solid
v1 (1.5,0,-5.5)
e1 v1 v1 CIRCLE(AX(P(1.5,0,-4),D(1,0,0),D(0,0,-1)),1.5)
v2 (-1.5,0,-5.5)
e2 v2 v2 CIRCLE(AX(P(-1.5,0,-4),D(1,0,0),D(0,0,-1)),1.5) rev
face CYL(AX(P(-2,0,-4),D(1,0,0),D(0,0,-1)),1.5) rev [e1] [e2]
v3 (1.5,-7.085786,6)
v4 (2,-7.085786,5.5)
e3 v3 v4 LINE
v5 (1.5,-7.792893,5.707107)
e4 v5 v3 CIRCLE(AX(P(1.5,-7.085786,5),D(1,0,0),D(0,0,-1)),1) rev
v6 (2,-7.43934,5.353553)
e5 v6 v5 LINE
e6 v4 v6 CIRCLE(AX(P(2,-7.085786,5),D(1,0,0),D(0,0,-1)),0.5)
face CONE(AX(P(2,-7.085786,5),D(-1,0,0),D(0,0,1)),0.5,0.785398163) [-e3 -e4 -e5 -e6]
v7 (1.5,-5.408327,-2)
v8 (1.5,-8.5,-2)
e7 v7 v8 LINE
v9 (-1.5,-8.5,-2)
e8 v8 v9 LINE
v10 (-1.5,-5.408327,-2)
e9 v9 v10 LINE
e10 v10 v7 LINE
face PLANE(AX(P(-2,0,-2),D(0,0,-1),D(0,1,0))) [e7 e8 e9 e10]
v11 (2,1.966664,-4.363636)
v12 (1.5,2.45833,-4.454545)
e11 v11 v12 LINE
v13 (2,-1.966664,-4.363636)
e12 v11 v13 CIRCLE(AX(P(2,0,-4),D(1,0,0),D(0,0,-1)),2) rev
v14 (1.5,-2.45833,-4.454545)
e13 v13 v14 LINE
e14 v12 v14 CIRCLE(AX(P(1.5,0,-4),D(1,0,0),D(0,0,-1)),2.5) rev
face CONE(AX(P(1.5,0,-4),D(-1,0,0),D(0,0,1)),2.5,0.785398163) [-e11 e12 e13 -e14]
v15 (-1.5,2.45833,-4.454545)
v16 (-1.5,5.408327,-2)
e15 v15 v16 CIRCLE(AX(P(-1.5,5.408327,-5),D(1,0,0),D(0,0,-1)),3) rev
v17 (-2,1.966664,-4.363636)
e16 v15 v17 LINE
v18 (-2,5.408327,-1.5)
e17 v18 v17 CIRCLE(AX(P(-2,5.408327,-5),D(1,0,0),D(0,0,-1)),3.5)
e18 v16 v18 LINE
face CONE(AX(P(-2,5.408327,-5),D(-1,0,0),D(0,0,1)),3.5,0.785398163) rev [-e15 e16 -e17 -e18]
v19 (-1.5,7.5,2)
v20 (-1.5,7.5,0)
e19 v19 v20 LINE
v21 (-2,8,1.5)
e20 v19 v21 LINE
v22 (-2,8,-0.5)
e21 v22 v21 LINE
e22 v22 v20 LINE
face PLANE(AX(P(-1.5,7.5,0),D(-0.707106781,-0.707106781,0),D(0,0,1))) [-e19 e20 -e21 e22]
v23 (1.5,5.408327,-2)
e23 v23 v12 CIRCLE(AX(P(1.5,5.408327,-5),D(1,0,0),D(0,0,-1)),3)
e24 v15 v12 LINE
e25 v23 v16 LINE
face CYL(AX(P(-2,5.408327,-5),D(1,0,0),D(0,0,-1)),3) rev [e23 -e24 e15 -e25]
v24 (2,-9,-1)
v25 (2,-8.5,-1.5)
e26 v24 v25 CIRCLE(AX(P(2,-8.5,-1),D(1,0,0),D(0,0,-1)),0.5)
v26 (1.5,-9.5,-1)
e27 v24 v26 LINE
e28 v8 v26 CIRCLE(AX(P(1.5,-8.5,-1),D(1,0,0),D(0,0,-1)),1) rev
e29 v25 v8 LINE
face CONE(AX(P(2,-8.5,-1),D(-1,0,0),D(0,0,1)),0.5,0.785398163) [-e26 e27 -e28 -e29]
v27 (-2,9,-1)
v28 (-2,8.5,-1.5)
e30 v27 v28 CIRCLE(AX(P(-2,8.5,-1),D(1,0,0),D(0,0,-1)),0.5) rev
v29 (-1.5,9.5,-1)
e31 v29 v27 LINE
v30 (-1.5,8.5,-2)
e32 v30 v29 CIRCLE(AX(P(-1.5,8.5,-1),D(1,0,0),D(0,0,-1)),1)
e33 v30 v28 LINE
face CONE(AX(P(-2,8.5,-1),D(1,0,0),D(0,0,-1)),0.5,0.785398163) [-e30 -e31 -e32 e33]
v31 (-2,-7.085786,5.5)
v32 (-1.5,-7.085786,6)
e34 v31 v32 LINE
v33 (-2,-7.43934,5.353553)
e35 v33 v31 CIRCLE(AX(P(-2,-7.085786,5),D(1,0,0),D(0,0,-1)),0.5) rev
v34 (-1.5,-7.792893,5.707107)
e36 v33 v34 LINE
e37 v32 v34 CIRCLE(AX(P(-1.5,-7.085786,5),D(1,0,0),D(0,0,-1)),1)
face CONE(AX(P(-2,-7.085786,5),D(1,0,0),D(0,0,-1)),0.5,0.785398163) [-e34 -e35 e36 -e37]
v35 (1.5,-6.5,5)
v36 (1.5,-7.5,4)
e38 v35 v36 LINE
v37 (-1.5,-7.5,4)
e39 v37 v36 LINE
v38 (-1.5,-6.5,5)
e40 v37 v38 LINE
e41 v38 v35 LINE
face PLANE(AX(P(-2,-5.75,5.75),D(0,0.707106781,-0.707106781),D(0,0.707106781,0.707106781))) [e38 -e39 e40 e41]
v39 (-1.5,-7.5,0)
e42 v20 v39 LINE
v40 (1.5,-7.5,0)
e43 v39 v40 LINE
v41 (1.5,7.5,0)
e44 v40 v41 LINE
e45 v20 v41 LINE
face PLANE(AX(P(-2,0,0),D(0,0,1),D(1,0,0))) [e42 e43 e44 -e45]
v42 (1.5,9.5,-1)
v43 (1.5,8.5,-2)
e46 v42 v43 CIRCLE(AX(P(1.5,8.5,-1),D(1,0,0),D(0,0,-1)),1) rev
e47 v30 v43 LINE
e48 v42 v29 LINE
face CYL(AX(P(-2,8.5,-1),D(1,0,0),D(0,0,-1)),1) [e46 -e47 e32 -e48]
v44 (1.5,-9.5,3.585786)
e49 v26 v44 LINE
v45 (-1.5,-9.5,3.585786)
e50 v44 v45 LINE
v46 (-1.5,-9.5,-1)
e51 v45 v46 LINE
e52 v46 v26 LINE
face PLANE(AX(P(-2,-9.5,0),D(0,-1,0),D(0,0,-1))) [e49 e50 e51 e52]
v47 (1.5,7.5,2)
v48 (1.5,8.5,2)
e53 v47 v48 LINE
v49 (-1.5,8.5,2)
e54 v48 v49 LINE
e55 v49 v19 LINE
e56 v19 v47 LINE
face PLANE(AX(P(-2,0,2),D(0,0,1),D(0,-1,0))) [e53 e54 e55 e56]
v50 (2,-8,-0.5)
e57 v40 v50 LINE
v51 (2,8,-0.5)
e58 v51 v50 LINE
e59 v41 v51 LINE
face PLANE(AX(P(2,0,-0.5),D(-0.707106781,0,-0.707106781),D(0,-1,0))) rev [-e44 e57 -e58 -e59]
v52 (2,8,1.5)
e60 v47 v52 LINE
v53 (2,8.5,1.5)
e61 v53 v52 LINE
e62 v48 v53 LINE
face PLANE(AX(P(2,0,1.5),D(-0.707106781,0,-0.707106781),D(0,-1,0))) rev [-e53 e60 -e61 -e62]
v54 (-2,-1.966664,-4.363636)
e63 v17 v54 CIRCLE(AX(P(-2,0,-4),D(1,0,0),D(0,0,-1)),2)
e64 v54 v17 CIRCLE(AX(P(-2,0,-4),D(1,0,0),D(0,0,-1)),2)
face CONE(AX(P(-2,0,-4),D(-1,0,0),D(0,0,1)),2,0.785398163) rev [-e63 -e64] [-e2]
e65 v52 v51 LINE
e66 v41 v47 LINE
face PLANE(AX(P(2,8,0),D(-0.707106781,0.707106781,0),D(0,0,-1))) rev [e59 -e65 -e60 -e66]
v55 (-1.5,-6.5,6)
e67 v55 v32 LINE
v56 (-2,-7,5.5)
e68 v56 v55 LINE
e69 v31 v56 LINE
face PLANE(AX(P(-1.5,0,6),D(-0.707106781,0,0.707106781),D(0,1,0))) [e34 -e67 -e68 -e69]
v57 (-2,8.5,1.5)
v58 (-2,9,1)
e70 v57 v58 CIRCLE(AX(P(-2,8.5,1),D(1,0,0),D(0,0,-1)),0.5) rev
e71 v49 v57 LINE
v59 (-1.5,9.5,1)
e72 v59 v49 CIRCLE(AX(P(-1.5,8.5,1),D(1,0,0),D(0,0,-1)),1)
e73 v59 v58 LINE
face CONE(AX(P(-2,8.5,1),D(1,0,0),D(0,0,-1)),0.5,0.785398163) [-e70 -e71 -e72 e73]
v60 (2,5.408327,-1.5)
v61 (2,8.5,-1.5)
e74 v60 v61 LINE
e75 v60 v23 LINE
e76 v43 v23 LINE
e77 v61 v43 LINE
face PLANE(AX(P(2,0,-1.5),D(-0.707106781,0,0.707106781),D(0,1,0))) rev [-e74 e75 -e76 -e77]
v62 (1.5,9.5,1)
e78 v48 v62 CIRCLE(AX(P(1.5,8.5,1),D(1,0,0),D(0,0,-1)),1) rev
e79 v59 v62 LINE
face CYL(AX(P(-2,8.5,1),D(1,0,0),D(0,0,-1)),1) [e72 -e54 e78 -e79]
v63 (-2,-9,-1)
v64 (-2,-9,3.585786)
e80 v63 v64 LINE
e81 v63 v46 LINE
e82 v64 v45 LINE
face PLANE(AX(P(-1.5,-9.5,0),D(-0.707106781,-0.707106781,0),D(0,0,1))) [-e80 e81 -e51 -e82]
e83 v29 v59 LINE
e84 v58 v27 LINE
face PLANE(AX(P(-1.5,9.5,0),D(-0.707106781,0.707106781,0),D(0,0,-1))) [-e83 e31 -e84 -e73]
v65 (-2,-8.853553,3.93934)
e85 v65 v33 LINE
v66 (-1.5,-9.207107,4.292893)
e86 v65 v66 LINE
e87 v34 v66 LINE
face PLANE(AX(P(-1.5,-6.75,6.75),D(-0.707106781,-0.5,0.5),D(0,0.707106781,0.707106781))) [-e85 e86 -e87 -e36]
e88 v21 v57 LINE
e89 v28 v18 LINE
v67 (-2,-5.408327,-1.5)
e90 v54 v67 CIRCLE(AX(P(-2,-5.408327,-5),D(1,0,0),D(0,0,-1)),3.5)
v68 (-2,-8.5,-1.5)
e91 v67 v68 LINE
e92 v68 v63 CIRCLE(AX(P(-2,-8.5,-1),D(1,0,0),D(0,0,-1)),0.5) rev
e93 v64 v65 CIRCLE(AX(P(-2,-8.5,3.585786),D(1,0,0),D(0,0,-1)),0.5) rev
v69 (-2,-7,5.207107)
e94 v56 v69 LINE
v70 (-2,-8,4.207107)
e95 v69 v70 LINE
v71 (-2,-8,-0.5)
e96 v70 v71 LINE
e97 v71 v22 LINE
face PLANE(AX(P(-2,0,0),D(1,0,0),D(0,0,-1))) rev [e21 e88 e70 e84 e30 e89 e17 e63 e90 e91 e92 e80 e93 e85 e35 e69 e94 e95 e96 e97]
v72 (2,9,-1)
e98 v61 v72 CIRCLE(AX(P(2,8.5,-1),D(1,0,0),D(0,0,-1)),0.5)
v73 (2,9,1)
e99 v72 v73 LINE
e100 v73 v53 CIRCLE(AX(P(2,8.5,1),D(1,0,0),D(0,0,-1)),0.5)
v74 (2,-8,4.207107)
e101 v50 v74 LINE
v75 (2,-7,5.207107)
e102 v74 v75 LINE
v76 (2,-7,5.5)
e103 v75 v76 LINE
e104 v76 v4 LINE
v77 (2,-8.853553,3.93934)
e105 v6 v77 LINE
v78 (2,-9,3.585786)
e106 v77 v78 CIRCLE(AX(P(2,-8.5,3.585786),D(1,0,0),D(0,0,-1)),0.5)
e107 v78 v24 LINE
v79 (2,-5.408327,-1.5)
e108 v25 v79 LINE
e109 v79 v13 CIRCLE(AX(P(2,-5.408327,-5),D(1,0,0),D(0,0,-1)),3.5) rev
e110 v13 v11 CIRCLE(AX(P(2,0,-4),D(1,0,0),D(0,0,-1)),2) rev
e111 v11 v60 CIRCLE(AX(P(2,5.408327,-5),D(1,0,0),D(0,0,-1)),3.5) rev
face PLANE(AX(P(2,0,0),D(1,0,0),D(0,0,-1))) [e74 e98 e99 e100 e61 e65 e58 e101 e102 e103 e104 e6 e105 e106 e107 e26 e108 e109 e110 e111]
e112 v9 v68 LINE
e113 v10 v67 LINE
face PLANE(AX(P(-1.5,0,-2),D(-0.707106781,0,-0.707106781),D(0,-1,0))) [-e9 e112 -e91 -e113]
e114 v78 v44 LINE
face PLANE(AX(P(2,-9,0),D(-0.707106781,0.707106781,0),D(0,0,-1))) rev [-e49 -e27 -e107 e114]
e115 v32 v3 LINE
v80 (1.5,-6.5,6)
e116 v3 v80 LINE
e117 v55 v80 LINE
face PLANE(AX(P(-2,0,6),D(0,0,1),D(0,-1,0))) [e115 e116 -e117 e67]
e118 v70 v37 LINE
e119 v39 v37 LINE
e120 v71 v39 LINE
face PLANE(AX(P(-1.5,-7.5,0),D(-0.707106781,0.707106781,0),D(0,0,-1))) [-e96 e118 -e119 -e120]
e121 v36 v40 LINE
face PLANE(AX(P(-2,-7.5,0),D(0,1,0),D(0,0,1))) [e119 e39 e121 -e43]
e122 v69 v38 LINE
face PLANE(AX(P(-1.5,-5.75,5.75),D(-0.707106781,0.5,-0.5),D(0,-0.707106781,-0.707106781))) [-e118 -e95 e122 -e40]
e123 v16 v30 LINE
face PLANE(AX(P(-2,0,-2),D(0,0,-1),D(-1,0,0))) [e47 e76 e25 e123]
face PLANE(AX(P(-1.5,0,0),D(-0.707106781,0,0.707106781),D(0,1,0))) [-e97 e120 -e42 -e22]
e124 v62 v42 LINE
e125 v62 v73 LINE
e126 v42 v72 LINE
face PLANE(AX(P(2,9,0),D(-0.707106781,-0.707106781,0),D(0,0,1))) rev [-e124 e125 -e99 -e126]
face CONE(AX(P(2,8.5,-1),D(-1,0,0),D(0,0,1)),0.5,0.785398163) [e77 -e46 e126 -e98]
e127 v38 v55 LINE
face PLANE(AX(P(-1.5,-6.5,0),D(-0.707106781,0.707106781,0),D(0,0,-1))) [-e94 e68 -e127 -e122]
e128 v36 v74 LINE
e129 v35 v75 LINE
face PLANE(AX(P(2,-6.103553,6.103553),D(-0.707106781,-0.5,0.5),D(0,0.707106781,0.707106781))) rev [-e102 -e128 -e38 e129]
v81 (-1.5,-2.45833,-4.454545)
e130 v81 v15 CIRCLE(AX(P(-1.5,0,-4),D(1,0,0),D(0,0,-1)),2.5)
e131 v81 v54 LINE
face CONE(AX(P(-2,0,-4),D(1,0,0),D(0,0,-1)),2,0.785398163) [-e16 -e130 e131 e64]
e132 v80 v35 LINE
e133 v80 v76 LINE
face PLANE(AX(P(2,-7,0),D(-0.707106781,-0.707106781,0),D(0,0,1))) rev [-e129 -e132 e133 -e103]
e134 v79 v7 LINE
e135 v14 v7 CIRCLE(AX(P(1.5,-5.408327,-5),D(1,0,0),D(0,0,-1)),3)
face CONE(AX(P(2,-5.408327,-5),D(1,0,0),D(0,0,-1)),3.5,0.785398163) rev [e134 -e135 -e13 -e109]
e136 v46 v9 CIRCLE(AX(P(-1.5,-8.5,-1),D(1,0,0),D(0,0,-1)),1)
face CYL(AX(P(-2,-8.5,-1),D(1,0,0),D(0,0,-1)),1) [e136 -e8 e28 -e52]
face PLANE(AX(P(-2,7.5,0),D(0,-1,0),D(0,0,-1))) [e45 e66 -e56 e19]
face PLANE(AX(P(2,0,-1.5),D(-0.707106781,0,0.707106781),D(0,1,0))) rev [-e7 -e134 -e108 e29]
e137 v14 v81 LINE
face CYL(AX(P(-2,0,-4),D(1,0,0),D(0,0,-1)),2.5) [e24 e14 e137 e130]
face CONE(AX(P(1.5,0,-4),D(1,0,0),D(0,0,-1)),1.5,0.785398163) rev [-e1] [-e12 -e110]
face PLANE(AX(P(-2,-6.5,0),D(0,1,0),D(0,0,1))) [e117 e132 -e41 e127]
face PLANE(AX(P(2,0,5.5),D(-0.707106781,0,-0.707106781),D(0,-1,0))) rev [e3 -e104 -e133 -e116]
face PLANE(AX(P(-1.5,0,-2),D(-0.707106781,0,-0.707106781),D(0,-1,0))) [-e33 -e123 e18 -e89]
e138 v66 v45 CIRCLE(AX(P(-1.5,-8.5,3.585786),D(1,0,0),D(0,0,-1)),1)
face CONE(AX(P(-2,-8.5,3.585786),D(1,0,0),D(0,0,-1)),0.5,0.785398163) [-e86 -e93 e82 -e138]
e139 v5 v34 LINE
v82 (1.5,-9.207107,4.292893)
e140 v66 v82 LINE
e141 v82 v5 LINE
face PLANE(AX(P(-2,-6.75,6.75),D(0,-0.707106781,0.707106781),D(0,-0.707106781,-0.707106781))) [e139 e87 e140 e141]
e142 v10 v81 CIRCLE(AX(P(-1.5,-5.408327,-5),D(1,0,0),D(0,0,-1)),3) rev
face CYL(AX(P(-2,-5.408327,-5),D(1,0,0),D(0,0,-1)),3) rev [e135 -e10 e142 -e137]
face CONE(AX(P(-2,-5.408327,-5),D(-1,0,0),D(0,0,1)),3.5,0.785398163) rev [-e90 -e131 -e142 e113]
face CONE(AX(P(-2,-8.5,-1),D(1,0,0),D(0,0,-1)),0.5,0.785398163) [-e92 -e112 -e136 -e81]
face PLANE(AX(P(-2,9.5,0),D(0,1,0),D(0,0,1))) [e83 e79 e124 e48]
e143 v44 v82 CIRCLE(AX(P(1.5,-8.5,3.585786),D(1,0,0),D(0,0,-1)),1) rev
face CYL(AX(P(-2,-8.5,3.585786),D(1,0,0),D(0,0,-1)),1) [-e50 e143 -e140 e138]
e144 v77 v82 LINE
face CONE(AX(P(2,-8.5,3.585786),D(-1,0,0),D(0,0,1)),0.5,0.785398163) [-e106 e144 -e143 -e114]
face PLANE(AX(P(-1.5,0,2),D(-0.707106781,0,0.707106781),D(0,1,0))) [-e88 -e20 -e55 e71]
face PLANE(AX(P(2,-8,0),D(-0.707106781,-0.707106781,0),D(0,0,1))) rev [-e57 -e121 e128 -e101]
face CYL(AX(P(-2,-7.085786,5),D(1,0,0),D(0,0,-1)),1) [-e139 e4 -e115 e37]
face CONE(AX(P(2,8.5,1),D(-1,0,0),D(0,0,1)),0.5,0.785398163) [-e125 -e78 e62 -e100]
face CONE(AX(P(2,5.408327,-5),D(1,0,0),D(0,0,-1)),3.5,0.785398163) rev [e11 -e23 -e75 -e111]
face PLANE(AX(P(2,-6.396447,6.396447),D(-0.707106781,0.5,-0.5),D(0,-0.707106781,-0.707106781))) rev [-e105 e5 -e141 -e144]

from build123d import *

# Parameters (mm, degrees)
BOSS_EXTRUDE1_DEPTH      = 2
BOSS_EXTRUDE1_DEPTH_BACK = 2
SKETCH2_R                = 1.5
FILLET1_R                = 3
FILLET2_R                = 1
CHAMFER1_SIZE            = 0.5


with BuildPart() as part:
    # Sketch2 → Boss-Extrude1 (new, two sides: drawn at the far end of the back side and taken through both)
    with BuildSketch(Plane(origin=(0, 0, 0), x_dir=(0, 0, -1), z_dir=(1, 0, 0)).offset(-BOSS_EXTRUDE1_DEPTH_BACK)):
        with BuildLine():
            ThreePointArc((4, 2.5), (6.5, 0), (4, -2.5))
            Line((4, -2.5), (2, -2.5))
            Line((2, -2.5), (2, -9.5))
            Line((2, -9.5), (-4, -9.5))
            Line((-4, -9.5), (-6, -7.5))
            Line((-6, -7.5), (-6, -6.5))
            Line((-6, -6.5), (-5, -6.5))
            Line((-5, -6.5), (-4, -7.5))
            Line((-4, -7.5), (0, -7.5))
            Line((0, -7.5), (0, 7.5))
            Line((0, 7.5), (-2, 7.5))
            Line((-2, 7.5), (-2, 9.5))
            Line((-2, 9.5), (2, 9.5))
            Line((2, 9.5), (2, 2.5))
            Line((2, 2.5), (4, 2.5))
        make_face()
        with Locations((4, 0)):
            Circle(SKETCH2_R, mode=Mode.SUBTRACT)
    extrude(amount=BOSS_EXTRUDE1_DEPTH + BOSS_EXTRUDE1_DEPTH_BACK)

    # Fillet1
    fillet1_edges = [part.edges().sort_by_distance(p)[0] for p in [
        (0, 2.5, -2),
        (0, -2.5, -2),
    ]]
    fillet(fillet1_edges, radius=FILLET1_R)

    # Fillet2
    fillet2_edges = [part.edges().sort_by_distance(p)[0] for p in [
        (0, -9.5, -2),
        (0, -9.5, 4),
        (0, -7.5, 6),
        (0, 9.5, 2),
        (0, 9.5, -2),
    ]]
    fillet(fillet2_edges, radius=FILLET2_R)

    # Chamfer1
    chamfer1_edges = [part.edges().sort_by_distance(p)[0] for p in [
        (2, -8.5, 5),
        (2, -9.5, 1.292893219),
        (2, -6.954163457, -2),
        (2, 9.207106781, -1.707106781),
        (2, -9.207106781, -1.707106781),
        (2, -9.423879533, 3.96846987),
        (2, -7.46846987, 5.923879533),
        (2, 9.207106781, 1.707106781),
        (-2, 8, 2),
        (-2, -6.954163457, -2),
        (-2, -9.5, 1.292893219),
        (-2, -8.5, 5),
        (-2, 9.207106781, -1.707106781),
        (-2, -9.207106781, -1.707106781),
        (-2, -9.423879533, 3.96846987),
        (-2, -7.46846987, 5.923879533),
        (-2, 9.207106781, 1.707106781),
        (-2, 7.5, 1),
        (-2, 0, 0),
        (-2, -7.5, 2),
        (2, 0, -2.5),
        (2, 7.5, 1),
        (-2, -7, 4.5),
        (2, 0, 0),
        (2, -7.5, 2),
        (2, -7, 4.5),
        (2, -6.5, 5.5),
        (2, -6.792893219, 6),
        (-2, -6.5, 5.5),
        (-2, -6.792893219, 6),
        (-2, 0, -2.5),
        (2, 0, -6.5),
        (-2, 0, -6.5),
        (2, 6.954163457, -2),
        (-2, 6.954163457, -2),
        (2, 3.489495707, -2.693902257),
        (-2, 3.489545225, -2.693861055),
        (2, -3.489545225, -2.693861055),
        (-2, -3.489545225, -2.693861055),
        (2, 9.5, 0),
        (-2, 9.5, 0),
        (2, 8, 2),
    ]]
    chamfer(chamfer1_edges, length=CHAMFER1_SIZE - 0.0001)  # a hair under: the kernel refuses the full size


solid = part.part
